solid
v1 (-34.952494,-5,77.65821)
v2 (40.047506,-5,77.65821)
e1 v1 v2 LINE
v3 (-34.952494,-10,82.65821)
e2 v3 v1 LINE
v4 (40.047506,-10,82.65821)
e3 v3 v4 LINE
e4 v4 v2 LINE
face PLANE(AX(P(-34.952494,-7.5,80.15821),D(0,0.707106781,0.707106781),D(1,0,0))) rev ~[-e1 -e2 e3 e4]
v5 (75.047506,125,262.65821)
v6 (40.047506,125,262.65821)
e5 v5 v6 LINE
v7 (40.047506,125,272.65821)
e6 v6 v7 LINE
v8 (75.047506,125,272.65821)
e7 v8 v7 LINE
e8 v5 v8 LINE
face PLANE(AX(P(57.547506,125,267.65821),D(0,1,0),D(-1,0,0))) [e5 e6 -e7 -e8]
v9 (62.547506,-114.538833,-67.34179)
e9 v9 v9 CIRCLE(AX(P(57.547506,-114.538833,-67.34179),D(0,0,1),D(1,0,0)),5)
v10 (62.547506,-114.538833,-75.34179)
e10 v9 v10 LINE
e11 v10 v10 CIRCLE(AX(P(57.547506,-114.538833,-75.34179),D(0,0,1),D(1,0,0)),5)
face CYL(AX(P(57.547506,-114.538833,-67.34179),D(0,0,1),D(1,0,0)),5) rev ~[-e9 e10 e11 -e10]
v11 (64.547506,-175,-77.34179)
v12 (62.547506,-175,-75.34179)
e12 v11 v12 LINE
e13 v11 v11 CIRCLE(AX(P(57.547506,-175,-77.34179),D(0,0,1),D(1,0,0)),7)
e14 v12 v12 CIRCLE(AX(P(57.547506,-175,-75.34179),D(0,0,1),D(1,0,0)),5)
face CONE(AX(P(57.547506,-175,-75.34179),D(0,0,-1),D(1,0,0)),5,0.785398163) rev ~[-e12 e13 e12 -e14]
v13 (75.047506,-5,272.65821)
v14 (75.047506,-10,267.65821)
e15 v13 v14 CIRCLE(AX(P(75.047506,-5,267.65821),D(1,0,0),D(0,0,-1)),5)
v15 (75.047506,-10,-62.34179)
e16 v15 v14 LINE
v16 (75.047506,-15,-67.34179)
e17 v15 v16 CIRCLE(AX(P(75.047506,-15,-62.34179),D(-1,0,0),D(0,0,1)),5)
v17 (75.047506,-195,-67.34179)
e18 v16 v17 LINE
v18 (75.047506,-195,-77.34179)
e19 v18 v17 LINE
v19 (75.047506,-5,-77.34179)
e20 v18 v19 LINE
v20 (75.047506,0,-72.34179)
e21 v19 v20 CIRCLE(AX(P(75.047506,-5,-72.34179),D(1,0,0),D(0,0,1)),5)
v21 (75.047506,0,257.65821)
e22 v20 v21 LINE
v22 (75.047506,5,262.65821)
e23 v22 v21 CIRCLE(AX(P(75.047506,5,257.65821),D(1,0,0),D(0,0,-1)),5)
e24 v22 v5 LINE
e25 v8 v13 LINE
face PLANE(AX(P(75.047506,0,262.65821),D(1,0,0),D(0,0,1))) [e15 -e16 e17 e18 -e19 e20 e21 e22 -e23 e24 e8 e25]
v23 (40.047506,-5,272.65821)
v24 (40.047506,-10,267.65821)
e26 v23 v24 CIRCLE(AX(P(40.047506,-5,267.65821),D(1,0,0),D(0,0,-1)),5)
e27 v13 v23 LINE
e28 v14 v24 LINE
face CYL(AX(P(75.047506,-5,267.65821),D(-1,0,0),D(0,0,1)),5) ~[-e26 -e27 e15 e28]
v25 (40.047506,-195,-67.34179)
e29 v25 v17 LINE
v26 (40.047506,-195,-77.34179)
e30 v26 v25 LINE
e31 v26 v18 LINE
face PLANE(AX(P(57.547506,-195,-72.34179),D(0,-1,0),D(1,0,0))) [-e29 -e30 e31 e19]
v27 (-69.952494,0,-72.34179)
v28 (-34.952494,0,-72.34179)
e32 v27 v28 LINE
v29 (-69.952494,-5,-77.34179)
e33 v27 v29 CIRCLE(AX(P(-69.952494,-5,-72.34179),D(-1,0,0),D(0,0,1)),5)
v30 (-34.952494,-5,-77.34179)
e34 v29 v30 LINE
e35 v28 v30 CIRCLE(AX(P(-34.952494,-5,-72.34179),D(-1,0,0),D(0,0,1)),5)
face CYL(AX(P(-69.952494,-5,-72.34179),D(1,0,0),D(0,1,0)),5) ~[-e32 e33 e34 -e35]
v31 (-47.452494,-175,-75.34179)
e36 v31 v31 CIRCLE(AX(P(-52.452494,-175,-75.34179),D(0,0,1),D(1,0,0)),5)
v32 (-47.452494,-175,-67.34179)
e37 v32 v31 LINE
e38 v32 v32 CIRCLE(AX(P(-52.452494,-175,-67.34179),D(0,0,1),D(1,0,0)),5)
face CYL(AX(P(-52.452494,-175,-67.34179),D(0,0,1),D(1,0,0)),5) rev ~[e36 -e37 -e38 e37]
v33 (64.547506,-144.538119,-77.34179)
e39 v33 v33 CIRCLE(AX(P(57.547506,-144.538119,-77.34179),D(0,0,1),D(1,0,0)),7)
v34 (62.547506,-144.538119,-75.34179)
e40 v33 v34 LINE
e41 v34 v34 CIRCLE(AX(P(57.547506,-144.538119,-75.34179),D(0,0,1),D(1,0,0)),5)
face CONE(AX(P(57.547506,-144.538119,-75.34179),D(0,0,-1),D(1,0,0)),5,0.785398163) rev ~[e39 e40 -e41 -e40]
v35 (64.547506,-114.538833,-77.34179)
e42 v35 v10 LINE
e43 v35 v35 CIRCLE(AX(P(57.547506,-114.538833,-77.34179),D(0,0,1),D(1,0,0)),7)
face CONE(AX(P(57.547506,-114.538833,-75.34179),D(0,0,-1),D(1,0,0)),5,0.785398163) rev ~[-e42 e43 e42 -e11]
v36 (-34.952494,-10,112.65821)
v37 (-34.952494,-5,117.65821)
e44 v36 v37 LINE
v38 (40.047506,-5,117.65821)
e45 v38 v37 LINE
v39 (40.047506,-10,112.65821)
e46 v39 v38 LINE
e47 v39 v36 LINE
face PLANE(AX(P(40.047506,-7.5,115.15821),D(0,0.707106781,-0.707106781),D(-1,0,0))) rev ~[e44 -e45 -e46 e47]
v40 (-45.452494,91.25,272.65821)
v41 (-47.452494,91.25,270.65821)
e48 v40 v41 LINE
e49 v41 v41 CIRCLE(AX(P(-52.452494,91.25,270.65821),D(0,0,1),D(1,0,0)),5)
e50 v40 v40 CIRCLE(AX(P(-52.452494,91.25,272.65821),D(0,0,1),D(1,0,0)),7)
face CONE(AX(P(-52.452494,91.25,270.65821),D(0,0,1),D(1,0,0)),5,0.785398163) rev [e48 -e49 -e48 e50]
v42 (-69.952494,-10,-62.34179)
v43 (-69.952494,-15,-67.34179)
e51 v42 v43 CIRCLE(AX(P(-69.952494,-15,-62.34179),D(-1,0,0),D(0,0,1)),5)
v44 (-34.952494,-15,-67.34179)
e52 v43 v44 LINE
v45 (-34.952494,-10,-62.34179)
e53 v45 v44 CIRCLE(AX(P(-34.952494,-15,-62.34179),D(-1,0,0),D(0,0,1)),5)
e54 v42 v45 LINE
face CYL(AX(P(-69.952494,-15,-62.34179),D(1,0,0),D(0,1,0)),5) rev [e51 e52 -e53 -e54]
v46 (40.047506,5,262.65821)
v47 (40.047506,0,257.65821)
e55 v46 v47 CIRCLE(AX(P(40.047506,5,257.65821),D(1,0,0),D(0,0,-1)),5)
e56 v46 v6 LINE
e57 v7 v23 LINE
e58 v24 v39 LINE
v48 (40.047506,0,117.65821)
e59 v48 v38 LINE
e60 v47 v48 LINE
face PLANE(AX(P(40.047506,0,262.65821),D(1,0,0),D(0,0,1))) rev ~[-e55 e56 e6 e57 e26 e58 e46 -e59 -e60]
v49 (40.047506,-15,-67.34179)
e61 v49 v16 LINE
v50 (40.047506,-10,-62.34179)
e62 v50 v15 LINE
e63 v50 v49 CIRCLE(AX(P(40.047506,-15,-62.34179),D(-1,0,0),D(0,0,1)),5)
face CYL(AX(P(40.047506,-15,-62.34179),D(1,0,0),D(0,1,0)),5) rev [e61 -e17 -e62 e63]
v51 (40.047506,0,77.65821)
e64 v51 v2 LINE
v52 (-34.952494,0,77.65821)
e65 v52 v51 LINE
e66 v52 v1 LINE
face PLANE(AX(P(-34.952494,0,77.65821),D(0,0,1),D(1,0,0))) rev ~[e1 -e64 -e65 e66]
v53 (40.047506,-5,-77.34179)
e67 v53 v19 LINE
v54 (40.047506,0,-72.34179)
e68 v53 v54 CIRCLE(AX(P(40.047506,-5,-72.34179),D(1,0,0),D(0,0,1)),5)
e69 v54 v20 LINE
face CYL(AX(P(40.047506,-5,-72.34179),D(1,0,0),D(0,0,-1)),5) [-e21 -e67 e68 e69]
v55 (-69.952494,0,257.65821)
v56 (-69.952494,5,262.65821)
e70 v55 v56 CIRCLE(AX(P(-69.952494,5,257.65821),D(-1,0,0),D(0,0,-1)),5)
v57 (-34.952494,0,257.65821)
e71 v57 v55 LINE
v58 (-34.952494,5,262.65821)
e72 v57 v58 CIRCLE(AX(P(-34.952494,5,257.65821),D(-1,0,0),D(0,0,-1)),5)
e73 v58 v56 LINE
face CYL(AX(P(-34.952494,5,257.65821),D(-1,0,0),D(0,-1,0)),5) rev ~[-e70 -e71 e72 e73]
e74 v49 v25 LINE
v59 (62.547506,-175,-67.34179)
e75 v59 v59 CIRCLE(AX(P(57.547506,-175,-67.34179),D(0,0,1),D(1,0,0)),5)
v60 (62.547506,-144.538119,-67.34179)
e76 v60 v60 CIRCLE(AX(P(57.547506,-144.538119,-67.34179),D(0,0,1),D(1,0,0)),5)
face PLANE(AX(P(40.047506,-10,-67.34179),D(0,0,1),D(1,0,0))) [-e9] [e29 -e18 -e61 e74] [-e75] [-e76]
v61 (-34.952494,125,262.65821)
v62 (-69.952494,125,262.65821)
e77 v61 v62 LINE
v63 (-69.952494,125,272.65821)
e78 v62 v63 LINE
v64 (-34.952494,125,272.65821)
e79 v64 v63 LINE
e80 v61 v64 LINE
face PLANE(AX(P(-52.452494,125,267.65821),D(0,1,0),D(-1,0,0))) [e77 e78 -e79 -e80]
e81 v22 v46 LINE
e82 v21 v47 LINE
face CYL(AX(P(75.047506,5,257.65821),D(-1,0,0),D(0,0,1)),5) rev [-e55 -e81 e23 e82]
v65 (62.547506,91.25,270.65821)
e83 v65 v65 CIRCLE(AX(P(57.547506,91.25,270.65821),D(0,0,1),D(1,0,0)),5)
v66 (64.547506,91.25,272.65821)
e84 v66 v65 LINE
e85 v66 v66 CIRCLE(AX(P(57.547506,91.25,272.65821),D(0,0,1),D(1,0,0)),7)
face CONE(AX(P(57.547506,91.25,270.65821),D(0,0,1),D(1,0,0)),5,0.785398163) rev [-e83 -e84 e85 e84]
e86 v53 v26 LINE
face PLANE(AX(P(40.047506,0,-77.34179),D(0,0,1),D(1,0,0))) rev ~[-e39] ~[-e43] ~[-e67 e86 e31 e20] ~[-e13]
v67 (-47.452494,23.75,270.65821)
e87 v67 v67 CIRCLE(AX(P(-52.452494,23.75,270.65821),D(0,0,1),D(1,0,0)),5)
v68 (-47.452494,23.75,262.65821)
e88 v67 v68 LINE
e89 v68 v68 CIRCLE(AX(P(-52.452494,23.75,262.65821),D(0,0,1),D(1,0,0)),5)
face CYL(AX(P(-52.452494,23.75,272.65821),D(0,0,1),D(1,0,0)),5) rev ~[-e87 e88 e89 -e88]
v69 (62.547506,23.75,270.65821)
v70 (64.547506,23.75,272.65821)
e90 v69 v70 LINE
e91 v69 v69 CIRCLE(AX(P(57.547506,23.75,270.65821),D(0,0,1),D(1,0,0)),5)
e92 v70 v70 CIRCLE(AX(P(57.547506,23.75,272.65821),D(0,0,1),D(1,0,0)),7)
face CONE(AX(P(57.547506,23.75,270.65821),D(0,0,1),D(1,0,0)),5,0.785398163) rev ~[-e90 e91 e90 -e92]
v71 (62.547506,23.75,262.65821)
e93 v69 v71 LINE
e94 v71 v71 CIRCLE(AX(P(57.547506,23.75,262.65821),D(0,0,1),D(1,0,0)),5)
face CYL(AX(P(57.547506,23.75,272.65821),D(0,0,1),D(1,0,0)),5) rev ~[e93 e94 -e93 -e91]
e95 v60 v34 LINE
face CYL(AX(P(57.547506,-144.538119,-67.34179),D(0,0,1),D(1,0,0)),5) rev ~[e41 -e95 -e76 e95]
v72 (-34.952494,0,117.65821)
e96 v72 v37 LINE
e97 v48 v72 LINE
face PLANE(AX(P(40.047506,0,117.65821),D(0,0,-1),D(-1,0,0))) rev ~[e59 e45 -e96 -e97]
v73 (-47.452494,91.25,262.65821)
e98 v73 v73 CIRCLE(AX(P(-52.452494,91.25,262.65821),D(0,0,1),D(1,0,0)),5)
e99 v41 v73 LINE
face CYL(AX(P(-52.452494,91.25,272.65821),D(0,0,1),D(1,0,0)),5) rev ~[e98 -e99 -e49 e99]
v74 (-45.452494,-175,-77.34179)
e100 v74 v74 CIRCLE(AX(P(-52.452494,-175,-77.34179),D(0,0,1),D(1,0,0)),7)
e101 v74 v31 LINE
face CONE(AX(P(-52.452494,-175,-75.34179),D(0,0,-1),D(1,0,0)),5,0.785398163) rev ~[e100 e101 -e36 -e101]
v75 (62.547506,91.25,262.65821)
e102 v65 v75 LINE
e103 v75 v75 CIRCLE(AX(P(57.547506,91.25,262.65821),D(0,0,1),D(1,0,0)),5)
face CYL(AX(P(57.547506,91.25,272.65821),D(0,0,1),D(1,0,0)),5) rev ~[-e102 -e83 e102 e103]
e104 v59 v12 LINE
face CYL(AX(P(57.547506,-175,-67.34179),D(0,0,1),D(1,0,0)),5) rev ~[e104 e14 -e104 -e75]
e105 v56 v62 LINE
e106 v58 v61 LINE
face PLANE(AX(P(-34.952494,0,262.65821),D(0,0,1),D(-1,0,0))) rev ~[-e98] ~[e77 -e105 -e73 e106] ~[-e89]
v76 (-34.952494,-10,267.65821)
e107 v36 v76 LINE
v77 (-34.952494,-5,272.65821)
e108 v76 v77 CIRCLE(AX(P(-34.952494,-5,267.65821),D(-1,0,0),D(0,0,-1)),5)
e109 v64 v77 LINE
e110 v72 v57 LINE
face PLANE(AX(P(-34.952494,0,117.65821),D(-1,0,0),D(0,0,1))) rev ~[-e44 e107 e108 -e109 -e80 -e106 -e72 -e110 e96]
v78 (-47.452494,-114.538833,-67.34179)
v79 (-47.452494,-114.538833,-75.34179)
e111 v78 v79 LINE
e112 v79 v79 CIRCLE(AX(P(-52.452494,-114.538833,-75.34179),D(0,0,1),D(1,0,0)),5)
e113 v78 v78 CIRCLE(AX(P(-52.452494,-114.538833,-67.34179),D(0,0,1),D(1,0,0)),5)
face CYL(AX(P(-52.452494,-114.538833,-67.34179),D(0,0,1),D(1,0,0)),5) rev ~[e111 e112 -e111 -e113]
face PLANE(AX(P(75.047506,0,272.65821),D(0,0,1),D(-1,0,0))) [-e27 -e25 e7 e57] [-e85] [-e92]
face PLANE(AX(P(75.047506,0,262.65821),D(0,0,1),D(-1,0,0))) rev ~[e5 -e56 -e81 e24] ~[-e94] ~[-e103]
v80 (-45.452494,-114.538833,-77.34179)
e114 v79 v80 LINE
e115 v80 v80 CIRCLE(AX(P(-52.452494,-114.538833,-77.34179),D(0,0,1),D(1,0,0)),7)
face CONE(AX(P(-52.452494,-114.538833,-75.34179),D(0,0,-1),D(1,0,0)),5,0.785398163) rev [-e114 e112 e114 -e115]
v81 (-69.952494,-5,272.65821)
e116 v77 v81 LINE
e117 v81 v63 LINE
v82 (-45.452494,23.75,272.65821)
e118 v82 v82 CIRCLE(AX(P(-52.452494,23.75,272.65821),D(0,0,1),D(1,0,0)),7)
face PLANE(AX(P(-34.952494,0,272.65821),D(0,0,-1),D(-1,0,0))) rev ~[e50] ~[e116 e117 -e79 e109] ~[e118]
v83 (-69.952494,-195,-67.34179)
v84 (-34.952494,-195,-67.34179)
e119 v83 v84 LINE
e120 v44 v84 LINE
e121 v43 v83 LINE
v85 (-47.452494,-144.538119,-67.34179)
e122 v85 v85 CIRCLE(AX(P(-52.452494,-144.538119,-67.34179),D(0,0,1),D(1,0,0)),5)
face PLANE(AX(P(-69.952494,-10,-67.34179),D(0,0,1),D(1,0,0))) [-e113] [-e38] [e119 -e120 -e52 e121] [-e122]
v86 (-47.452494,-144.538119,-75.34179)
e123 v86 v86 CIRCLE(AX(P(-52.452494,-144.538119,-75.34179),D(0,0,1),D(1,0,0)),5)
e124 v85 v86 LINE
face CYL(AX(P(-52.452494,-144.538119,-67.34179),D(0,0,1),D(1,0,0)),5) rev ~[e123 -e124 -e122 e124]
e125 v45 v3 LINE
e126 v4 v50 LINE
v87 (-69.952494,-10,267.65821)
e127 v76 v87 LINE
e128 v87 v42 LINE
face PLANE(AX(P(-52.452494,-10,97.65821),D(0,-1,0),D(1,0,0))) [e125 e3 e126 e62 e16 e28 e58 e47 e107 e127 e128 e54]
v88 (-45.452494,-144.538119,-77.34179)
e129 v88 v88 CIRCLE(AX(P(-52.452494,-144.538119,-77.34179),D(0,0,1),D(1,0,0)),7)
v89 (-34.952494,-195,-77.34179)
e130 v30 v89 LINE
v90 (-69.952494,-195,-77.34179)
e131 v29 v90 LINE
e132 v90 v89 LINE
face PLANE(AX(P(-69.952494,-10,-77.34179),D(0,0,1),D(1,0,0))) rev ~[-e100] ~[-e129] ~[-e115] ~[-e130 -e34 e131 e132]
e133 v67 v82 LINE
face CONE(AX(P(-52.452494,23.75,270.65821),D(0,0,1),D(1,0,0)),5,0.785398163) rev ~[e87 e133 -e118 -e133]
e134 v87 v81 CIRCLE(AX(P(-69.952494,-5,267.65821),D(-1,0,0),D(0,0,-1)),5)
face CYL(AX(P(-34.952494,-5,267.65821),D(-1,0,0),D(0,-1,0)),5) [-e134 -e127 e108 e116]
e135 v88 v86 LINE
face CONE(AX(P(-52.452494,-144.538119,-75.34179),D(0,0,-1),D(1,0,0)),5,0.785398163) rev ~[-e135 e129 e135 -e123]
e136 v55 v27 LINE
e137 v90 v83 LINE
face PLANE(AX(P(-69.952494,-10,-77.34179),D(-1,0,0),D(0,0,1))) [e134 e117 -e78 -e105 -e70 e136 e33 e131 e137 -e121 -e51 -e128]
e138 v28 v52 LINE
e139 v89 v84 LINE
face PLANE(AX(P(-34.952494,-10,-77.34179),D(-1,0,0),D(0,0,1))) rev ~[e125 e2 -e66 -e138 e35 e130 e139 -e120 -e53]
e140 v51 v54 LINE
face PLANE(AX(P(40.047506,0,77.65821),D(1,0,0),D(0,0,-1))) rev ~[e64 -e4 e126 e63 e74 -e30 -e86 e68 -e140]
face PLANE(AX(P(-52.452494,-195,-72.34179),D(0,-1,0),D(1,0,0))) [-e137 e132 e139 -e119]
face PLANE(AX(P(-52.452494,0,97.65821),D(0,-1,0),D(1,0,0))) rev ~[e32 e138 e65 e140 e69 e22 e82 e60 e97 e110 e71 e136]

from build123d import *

# Parameters (mm, degrees)
F1_DEPTH = 10
F2_W     = 35
F2_H     = 10
F3_DEPTH = 185
F4_R     = 5
F5_DEPTH = 25
F6_W     = 35
F6_H     = 10
F7_DEPTH = 125
F8_R     = 5
F9_DEPTH = 25
F10_R    = 5
F11_SIZE = 5
F12_SIZE = 2


with BuildPart() as f1:
    # F0 (on Front) → F1 (new body)
    with BuildSketch(Plane.XZ):
        Polygon((-34.9524939805, 272.6582099839), (-69.9524939805, 272.6582099839), (-69.9524939805, -77.3417900161), (-34.9524939805, -77.3417900161), (-34.9524939805, 77.6582099839), (-34.9524939805, 97.6582099839), (-34.9524939805, 117.6582099839), align=None)
        Polygon((40.0475060195, 117.6582099839), (-34.9524939805, 117.6582099839), (-34.9524939805, 97.6582099839), (-34.9524939805, 77.6582099839), (40.0475060195, 77.6582099839), align=None)
        Polygon((40.0475060195, 272.6582099839), (40.0475060195, 117.6582099839), (40.0475060195, 77.6582099839), (40.0475060195, -77.3417900161), (75.0475060195, -77.3417900161), (75.0475060195, 272.6582099839), align=None)
    extrude(amount=F1_DEPTH)

    # F2 (on face) → F3 (join)
    with BuildSketch(Plane.XZ.offset(10)):
        with Locations((-52.4524939805, -72.3417900161)):
            Rectangle(F2_W, F2_H)
        with Locations((57.5475060195, -72.3417900161)):
            Rectangle(F2_W, F2_H)
    extrude(amount=F3_DEPTH)

    # F4 (on face) → F5 (cut)
    with BuildSketch(Plane.XY.offset(-67.3417900161)):
        with Locations((57.5475060195, -114.538833499)):
            Circle(F4_R)
        with Locations((57.5475060195, -144.5381194353)):
            Circle(F4_R)
        with Locations((57.5475060195, -175)):
            Circle(F4_R)
        with Locations((-52.4524939805, -114.538833499)):
            Circle(F4_R)
        with Locations((-52.4524939805, -144.5381194353)):
            Circle(F4_R)
        with Locations((-52.4524939805, -175)):
            Circle(F4_R)
    extrude(amount=-F5_DEPTH, mode=Mode.SUBTRACT)

    # F6 (on face) → F7 (join)
    with BuildSketch(Plane(origin=(0, 0, 0), x_dir=(-1, 0, 0), z_dir=(0, 1, 0))):
        with Locations((-57.5475060195, 267.6582099839)):
            Rectangle(F6_W, F6_H)
        with Locations((52.4524939805, 267.6582099839)):
            Rectangle(F6_W, F6_H)
    extrude(amount=F7_DEPTH)

    # F8 (on face) → F9 (cut)
    with BuildSketch(Plane.XY.offset(272.6582099839)):
        with Locations((-52.4524939805, 23.75)):
            Circle(F8_R)
        with Locations((-52.4524939805, 91.25)):
            Circle(F8_R)
        with Locations((57.5475060195, 91.25)):
            Circle(F8_R)
        with Locations((57.5475060195, 23.75)):
            Circle(F8_R)
    extrude(amount=-F9_DEPTH, mode=Mode.SUBTRACT)

    # F10
    f10_edges = [f1.edges().sort_by_distance(p)[0] for p in [
        (-52.452494, -10, 272.65821),
        (57.547506, -10, 272.65821),
        (-52.452494, -10, -67.34179),
        (57.547506, -10, -67.34179),
        (-52.452494, 0, -77.34179),
        (57.547506, 0, -77.34179),
        (-52.452494, 0, 262.65821),
        (57.547506, 0, 262.65821),
    ]]
    fillet(f10_edges, radius=F10_R)

    # F11
    f11_edges = [f1.edges().sort_by_distance(p)[0] for p in [
        (2.547506, -10, 77.65821),
        (2.547506, -10, 117.65821),
    ]]
    chamfer(f11_edges, length=F11_SIZE)

    # F12
    f12_edges = [f1.edges().sort_by_distance(p)[0] for p in [
        (52.547506, 23.75, 272.65821),
        (52.547506, 91.25, 272.65821),
        (-57.452494, 23.75, 272.65821),
        (-57.452494, 91.25, 272.65821),
        (-57.452494, -175, -77.34179),
        (-57.452494, -144.538119, -77.34179),
        (-57.452494, -114.538833, -77.34179),
        (52.547506, -114.538833, -77.34179),
        (52.547506, -144.538119, -77.34179),
        (52.547506, -175, -77.34179),
    ]]
    chamfer(f12_edges, length=F12_SIZE)


solid = f1.part
